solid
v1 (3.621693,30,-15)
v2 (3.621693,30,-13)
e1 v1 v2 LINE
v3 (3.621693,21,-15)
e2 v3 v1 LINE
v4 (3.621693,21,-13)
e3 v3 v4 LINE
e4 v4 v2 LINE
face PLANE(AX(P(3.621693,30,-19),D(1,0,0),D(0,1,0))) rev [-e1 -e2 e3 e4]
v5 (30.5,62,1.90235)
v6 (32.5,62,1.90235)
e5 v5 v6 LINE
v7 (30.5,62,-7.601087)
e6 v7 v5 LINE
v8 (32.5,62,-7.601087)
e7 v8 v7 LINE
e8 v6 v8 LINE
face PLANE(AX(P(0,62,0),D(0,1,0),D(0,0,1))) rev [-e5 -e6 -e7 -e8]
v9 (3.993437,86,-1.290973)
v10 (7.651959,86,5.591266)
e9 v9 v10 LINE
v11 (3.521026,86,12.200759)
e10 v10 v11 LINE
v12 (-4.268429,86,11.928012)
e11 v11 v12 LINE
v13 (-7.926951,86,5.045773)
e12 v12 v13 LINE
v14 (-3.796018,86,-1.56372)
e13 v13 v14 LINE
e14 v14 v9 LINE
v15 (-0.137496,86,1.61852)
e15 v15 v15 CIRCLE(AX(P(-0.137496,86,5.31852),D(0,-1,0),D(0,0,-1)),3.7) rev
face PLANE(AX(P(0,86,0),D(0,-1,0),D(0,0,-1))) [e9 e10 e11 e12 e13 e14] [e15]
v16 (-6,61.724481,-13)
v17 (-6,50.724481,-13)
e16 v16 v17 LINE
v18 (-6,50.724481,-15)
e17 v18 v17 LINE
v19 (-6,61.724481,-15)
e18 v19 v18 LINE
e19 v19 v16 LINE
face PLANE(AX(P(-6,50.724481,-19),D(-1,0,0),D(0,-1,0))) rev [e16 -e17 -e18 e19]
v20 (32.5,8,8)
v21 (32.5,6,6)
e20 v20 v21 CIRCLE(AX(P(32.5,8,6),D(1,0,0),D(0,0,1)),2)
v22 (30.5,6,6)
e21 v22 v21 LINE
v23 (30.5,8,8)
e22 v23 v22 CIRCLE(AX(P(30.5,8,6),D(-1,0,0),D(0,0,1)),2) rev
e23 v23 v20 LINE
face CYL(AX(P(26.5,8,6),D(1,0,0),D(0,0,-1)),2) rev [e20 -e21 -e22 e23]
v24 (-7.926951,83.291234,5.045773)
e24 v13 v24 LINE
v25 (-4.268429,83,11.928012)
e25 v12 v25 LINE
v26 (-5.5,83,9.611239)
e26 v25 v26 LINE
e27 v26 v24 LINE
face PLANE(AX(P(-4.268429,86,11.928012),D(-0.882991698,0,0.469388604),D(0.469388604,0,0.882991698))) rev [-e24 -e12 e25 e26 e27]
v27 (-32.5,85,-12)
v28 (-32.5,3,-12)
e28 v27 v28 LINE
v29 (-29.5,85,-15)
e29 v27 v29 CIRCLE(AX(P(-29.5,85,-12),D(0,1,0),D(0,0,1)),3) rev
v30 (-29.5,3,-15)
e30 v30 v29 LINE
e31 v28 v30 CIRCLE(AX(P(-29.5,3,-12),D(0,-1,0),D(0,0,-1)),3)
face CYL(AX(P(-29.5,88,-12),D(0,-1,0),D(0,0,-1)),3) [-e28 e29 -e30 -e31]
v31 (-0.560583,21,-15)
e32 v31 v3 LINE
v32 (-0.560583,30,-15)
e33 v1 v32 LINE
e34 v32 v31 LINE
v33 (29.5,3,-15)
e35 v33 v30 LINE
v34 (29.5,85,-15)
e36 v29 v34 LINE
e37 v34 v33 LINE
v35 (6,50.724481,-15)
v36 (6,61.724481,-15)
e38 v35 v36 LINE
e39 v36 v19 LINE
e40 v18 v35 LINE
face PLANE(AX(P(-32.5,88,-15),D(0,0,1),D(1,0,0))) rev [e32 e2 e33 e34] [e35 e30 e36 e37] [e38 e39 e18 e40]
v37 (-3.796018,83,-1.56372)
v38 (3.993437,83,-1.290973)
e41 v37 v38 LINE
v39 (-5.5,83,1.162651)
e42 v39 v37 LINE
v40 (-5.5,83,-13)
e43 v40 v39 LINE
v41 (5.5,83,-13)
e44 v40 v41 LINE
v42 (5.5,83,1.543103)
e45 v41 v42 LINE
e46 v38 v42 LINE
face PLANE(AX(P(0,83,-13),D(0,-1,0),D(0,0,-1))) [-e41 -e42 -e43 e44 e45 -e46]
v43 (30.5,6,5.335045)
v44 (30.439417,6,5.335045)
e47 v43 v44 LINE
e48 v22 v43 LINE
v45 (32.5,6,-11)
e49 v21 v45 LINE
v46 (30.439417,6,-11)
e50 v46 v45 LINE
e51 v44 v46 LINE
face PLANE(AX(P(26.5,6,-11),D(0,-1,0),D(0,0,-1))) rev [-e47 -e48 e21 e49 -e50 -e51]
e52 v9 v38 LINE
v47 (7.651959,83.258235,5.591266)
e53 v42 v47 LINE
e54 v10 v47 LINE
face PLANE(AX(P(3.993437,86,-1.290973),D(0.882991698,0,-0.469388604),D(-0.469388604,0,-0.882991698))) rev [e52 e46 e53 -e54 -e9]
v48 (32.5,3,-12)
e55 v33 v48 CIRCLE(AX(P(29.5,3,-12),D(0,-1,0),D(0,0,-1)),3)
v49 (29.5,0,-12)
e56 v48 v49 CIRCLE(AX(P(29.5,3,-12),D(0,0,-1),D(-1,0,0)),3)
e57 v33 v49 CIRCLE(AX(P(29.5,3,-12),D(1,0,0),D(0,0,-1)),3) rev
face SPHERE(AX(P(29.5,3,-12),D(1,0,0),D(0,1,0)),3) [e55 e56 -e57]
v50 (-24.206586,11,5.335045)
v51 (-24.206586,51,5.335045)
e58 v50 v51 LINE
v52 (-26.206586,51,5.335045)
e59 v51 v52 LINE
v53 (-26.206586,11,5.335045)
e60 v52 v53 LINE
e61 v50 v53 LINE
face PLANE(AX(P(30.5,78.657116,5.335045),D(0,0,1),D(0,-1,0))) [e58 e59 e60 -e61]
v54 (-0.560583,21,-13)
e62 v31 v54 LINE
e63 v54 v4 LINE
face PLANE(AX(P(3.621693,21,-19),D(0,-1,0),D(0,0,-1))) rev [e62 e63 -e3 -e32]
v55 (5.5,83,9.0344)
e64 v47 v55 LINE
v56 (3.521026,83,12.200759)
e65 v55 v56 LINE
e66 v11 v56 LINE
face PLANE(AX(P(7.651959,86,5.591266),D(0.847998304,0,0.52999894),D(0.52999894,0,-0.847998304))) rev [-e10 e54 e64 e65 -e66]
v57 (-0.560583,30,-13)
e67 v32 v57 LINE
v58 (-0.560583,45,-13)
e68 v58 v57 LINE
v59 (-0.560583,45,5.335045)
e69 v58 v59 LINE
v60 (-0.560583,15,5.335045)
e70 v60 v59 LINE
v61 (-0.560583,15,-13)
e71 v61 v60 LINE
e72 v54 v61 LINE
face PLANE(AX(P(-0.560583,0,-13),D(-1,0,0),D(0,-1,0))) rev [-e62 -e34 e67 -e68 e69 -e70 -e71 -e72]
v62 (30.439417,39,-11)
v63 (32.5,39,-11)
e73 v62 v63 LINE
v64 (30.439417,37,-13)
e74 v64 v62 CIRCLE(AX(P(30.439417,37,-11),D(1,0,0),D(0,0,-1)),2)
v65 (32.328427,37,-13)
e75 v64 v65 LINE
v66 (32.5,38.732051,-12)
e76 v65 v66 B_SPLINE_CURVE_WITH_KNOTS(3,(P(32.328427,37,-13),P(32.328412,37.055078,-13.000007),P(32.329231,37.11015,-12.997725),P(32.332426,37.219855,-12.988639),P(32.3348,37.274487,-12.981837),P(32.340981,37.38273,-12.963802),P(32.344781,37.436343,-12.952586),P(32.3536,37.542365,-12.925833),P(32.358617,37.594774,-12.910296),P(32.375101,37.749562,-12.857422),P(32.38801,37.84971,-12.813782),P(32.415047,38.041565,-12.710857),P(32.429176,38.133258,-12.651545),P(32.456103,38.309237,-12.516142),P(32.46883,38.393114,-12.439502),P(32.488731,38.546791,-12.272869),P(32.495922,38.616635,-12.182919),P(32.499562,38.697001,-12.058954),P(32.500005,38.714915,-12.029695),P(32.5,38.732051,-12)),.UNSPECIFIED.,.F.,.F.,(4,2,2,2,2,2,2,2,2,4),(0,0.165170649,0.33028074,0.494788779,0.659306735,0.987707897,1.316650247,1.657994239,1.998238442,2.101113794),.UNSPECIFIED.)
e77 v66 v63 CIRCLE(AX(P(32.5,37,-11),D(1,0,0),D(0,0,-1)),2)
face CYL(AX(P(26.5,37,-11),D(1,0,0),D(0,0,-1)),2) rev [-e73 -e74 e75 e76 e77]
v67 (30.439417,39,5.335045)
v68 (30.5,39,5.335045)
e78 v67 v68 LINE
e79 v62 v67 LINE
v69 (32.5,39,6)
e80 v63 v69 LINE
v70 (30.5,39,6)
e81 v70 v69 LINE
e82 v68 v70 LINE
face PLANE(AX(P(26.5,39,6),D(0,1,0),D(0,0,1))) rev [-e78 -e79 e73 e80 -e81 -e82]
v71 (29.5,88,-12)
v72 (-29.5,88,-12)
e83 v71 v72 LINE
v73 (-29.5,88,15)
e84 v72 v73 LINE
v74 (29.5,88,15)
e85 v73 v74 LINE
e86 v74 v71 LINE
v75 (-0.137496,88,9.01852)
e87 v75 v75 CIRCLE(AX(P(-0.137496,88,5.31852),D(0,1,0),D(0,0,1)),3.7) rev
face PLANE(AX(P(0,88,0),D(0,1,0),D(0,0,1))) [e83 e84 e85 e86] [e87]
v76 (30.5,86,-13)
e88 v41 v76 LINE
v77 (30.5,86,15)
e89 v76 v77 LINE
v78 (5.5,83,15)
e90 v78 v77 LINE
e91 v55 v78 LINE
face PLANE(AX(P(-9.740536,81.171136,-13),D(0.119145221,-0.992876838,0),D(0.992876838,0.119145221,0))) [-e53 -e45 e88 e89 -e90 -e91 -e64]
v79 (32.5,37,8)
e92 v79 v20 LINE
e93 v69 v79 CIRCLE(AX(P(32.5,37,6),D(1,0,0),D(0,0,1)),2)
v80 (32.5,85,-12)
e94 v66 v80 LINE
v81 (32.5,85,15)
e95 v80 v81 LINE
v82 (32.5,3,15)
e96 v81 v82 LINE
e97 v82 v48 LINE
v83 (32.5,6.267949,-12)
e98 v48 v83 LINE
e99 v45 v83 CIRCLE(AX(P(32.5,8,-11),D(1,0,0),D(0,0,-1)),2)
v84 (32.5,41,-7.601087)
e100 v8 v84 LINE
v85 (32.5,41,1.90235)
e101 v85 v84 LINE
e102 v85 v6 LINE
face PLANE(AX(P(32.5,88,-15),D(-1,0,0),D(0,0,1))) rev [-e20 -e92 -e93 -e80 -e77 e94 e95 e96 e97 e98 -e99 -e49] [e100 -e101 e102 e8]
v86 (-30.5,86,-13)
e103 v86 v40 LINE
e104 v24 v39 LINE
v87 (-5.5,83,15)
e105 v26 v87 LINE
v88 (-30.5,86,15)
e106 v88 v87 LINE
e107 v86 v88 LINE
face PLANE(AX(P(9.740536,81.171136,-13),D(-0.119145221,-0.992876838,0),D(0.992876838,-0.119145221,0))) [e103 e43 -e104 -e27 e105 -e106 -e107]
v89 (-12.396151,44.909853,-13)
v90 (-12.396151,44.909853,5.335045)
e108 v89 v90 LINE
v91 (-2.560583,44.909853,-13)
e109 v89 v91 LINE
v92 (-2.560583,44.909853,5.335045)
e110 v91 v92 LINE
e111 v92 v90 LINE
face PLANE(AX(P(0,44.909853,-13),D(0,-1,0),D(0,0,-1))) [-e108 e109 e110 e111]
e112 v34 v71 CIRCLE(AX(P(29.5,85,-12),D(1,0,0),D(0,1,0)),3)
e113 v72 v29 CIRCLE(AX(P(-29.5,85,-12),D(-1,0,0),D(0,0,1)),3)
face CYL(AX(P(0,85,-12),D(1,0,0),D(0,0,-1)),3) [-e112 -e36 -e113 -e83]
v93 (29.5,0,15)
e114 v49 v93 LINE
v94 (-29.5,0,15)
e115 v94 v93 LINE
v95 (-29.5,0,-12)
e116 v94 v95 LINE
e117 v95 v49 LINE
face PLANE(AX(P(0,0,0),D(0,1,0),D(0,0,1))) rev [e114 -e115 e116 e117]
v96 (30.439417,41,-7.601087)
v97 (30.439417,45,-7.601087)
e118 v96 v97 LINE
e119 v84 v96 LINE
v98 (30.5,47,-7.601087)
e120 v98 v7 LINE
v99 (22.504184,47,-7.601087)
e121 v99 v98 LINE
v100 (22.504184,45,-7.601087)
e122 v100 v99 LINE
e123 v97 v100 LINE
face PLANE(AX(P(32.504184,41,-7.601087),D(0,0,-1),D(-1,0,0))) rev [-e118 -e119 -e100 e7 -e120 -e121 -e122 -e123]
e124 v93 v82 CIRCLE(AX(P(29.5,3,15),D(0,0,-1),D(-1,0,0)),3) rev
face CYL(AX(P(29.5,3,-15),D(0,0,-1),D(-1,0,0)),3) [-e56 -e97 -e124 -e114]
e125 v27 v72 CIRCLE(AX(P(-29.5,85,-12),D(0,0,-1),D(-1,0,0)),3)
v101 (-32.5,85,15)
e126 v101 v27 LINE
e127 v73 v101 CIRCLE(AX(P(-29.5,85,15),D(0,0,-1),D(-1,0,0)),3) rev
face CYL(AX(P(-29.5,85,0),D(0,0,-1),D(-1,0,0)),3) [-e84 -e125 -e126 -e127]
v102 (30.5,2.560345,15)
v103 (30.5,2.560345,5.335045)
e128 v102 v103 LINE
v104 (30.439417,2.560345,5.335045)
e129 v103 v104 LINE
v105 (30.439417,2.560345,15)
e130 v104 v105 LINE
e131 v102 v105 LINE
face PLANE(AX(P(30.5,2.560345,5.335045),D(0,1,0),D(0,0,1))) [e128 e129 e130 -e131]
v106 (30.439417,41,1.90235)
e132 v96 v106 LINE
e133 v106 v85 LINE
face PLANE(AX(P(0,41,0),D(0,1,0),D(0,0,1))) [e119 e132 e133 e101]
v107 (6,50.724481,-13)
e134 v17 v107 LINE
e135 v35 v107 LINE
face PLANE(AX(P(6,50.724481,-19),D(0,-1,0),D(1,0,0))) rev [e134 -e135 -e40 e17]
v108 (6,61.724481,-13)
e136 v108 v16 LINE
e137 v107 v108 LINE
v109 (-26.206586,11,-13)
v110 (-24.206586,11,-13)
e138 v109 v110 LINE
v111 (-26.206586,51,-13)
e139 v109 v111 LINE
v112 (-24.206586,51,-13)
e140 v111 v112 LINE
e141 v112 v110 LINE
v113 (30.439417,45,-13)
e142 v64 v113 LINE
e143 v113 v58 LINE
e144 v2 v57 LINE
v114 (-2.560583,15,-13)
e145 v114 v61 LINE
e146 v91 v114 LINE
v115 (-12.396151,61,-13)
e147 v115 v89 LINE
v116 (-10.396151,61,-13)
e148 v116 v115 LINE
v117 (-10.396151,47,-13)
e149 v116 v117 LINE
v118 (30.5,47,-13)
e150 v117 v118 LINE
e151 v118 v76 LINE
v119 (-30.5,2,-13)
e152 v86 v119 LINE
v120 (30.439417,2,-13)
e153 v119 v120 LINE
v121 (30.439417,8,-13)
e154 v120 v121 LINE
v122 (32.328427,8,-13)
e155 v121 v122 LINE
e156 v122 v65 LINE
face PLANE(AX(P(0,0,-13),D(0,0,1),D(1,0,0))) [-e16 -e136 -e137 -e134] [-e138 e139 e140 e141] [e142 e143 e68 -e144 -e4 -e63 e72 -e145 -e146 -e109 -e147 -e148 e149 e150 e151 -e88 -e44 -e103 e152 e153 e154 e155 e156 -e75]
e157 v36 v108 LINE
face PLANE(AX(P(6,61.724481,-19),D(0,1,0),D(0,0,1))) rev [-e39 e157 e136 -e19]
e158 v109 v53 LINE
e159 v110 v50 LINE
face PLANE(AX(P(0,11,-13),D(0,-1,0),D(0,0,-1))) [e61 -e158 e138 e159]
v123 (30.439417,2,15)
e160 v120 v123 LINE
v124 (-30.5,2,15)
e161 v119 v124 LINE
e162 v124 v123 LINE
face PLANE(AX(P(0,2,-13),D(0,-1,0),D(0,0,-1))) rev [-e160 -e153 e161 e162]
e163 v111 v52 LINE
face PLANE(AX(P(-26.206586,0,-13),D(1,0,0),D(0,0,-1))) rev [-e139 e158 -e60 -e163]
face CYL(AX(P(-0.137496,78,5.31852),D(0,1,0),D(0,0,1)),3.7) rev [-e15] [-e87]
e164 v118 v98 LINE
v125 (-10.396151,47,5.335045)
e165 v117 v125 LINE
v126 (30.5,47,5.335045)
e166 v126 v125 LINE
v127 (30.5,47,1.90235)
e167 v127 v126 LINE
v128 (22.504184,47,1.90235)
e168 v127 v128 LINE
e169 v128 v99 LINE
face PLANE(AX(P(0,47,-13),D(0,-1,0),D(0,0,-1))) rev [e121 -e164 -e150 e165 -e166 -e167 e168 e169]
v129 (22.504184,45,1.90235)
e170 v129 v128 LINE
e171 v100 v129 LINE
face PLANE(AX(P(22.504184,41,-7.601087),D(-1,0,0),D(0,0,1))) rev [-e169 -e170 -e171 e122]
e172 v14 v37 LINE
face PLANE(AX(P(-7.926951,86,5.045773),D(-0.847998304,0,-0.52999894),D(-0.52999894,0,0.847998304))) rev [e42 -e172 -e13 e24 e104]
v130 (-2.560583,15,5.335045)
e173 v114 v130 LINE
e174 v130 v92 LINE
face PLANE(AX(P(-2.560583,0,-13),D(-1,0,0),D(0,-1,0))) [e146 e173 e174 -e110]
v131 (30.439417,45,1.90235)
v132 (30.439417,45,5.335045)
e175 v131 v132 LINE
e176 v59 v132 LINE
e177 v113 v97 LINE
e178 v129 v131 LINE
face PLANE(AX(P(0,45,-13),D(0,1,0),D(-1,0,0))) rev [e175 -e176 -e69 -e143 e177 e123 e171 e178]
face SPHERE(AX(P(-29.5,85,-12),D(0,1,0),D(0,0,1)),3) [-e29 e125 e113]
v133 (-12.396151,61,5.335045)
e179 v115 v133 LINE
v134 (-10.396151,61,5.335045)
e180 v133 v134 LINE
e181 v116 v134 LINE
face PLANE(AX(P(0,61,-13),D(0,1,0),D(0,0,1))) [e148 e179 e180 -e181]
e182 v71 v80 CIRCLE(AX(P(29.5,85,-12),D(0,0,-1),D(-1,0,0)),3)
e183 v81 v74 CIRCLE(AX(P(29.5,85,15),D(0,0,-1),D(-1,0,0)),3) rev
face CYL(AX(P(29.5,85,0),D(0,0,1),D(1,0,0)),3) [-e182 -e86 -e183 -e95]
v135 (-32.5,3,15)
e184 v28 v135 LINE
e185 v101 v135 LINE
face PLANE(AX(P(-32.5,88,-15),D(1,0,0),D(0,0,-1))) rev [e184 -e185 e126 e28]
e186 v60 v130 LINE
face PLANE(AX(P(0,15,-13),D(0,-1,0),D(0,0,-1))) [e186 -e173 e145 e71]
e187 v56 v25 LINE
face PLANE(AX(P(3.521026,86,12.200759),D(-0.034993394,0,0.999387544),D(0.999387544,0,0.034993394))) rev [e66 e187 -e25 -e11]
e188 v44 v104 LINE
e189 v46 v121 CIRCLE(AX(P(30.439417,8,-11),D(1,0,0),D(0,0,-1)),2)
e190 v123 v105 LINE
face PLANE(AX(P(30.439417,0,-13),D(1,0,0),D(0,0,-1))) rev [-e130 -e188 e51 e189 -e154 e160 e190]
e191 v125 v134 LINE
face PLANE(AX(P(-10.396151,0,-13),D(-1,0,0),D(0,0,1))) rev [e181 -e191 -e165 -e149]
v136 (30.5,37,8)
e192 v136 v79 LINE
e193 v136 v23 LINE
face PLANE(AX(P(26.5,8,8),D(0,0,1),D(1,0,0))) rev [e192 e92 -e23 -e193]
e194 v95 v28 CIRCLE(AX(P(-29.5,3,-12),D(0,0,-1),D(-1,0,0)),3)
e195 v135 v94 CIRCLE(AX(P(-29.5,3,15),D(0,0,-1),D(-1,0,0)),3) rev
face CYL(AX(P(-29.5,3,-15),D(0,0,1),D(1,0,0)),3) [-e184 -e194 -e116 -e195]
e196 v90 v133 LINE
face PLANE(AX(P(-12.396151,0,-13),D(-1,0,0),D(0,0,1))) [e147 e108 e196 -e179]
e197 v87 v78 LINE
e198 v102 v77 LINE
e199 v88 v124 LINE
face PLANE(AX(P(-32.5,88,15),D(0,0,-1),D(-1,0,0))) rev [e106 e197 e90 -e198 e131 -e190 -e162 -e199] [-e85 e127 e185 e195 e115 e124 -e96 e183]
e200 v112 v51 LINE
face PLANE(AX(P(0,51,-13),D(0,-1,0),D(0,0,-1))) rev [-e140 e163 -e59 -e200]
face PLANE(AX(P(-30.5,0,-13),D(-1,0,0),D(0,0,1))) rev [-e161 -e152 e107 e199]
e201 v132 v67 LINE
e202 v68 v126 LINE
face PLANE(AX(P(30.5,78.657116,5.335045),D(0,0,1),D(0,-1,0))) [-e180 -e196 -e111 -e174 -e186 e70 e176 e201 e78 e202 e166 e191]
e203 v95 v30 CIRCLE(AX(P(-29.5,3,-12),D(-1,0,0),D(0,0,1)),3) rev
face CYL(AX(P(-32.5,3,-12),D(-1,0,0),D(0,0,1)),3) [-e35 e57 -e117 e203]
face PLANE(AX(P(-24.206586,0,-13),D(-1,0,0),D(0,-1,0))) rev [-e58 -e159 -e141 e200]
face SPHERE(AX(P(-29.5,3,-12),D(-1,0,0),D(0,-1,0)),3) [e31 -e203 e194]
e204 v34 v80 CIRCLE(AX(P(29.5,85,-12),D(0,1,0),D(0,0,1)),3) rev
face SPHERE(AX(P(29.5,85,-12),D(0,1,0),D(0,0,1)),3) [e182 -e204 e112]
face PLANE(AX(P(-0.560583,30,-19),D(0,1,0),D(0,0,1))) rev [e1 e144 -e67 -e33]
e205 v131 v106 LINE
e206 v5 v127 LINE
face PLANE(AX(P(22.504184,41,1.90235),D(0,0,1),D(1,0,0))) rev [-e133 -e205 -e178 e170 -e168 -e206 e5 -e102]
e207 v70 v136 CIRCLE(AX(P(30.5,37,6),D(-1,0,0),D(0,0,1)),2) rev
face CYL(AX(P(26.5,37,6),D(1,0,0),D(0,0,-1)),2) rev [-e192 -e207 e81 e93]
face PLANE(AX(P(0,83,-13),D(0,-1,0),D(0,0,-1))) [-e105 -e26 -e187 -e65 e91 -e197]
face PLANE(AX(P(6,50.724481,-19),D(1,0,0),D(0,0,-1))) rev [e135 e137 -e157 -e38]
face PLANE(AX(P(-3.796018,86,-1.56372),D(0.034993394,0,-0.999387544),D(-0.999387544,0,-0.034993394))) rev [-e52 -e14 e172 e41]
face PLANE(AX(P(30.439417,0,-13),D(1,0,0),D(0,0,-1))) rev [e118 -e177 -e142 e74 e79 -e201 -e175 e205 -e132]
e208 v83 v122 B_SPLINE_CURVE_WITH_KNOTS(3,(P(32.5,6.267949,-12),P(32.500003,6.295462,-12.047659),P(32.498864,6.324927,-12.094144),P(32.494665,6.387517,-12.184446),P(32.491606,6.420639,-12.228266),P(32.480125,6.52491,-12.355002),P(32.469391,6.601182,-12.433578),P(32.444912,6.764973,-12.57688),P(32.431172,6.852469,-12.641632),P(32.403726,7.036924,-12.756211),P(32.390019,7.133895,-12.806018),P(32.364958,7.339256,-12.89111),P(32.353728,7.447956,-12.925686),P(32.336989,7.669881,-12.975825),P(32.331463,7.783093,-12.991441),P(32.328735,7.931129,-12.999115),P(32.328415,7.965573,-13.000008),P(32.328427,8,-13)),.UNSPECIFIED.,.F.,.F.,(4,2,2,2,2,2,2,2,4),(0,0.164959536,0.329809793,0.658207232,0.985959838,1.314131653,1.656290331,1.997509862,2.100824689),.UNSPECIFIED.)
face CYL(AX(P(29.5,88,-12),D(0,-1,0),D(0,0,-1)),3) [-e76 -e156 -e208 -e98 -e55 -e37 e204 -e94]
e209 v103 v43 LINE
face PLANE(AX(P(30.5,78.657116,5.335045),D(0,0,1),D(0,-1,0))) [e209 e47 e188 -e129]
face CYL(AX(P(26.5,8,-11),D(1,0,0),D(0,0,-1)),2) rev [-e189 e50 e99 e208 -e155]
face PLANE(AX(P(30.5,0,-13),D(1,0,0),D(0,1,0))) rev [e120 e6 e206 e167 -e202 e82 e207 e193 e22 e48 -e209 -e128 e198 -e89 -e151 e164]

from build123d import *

# Parameters (mm, degrees)
SKETCH_1_W               = 65
SKETCH_1_H               = 30
EXTRUDE_1_DEPTH          = 88
SKETCH_4_W               = 2
SKETCH_4_H               = 40
CUT_EXTRUDE_1_DEPTH      = 28
CUT_EXTRUDE_2_DEPTH      = 6
SKETCH_7_W               = 4.182275868
SKETCH_7_H               = 9
CUT_EXTRUDE_3_DEPTH      = 6
SKETCH_8_W               = 12
SKETCH_8_H               = 11
CUT_EXTRUDE_4_DEPTH      = 6
FILLET_1_R               = 3
CUT_EXTRUDE_5_DEPTH      = 3
CUT_EXTRUDE_6_DEPTH      = 15
CUT_EXTRUDE_6_DEPTH_BACK = 6
SKETCH_12_W              = 10
SKETCH_12_H              = 9.5034376
CUT_EXTRUDE_8_DEPTH      = 5
CUT_EXTRUDE_8_DEPTH_BACK = 10
SKETCH_18_R              = 3.7
SKETCH_19_W              = 9.664954626
SKETCH_19_H              = 76.096771223
CUT_EXTRUDE_9_DEPTH      = 61


with BuildPart() as part:
    # 草图1 → 凸台-拉伸1 (new body)
    with BuildSketch(Plane(origin=(0, 0, 0), x_dir=(1, 0, 0), z_dir=(0, 1, 0))):
        Rectangle(SKETCH_1_W, SKETCH_1_H)
    extrude(amount=EXTRUDE_1_DEPTH)

    # 草图4 → 切除-拉伸1 (cut)
    with BuildSketch(Plane.XY.offset(15)):
        Polygon((-30.5, 86), (-30.5, 2), (-18.5, 2), (-9.5, 2), (30.439417497, 2), (30.439417497, 45), (-0.560582503, 45), (-0.560582503, 15), (-2.560582503, 15), (-2.560582503, 44.909852699), (-12.396150881, 44.909852699), (-12.396150881, 61), (-10.396150881, 61), (-10.396150881, 47), (24.5, 47), (30.5, 47), (30.5, 48.635726891), (30.5, 59.903593532), (30.5, 86), (5.5, 83), (-5.5, 83), align=None)
        with Locations((-25.206585503, 31)):
            Rectangle(SKETCH_4_W, SKETCH_4_H, mode=Mode.SUBTRACT)
    extrude(amount=-CUT_EXTRUDE_1_DEPTH, mode=Mode.SUBTRACT)

    # 草图6 → 切除-拉伸2 (cut)
    with BuildSketch(Plane(origin=(32.5, 0, 0), x_dir=(0, 0, -1), z_dir=(1, 0, 0))):
        with BuildLine():
            Line((13, 37), (13, 8))
            ThreePointArc((13, 8), (12.414213562, 6.585786438), (11, 6))
            Line((11, 6), (-6, 6))
            ThreePointArc((-6, 6), (-7.414213562, 6.585786438), (-8, 8))
            Line((-8, 8), (-8, 37))
            ThreePointArc((-8, 37), (-7.414213562, 38.414213562), (-6, 39))
            Line((-6, 39), (11, 39))
            ThreePointArc((11, 39), (12.414213562, 38.414213562), (13, 37))
        make_face()
    extrude(amount=-CUT_EXTRUDE_2_DEPTH, mode=Mode.SUBTRACT)

    # 草图7 → 切除-拉伸3 (cut)
    with BuildSketch(Plane.XY.offset(-13)):
        with Locations((1.530555431, 25.5)):
            Rectangle(SKETCH_7_W, SKETCH_7_H)
    extrude(amount=-CUT_EXTRUDE_3_DEPTH, mode=Mode.SUBTRACT)

    # 草图8 → 切除-拉伸4 (cut)
    with BuildSketch(Plane.XY.offset(-13)):
        with Locations((0, 56.224480757)):
            Rectangle(SKETCH_8_W, SKETCH_8_H)
    extrude(amount=-CUT_EXTRUDE_4_DEPTH, mode=Mode.SUBTRACT)

    # 圆角1
    # the kernel refuses this fillet: 3 mm, written as the material it takes off along each edge
    with BuildSketch(Plane(origin=(29.5, 3, -12), x_dir=(0, -1, 0), z_dir=(0, 0, -1))) as fillet_1_piece_1_section:
        Polygon((0, 0), (FILLET_1_R, 0), (FILLET_1_R, -FILLET_1_R), (0, -FILLET_1_R), align=None)
    fillet_1_piece_1 = extrude(amount=FILLET_1_R, mode=Mode.PRIVATE)
    fillet_1_piece_1 = fillet_1_piece_1 - Plane(origin=(29.5, 3, -12), x_dir=(-0.7071067811865475, 0.7071067811865475, 0), z_dir=(0, 0, -1)) * Sphere(FILLET_1_R, mode=Mode.PRIVATE)
    add(fillet_1_piece_1, mode=Mode.SUBTRACT)
    with BuildSketch(Plane(origin=(29.5, 85, -12), x_dir=(0, 1, 0), z_dir=(0, 0, -1))) as fillet_1_piece_2_section:
        Polygon((0, 0), (FILLET_1_R, 0), (FILLET_1_R, FILLET_1_R), (0, FILLET_1_R), align=None)
    fillet_1_piece_2 = extrude(amount=FILLET_1_R, mode=Mode.PRIVATE)
    fillet_1_piece_2 = fillet_1_piece_2 - Plane(origin=(29.5, 85, -12), x_dir=(-0.7071067811865475, -0.7071067811865475, 0), z_dir=(0, 0, -1)) * Sphere(FILLET_1_R, mode=Mode.PRIVATE)
    add(fillet_1_piece_2, mode=Mode.SUBTRACT)
    with BuildSketch(Plane(origin=(-29.5, 3, -12), x_dir=(-1, 0, 0), z_dir=(0, 0, -1))) as fillet_1_piece_3_section:
        Polygon((0, 0), (FILLET_1_R, 0), (FILLET_1_R, -FILLET_1_R), (0, -FILLET_1_R), align=None)
    fillet_1_piece_3 = extrude(amount=FILLET_1_R, mode=Mode.PRIVATE)
    fillet_1_piece_3 = fillet_1_piece_3 - Plane(origin=(-29.5, 3, -12), x_dir=(0.7071067811865475, 0.7071067811865475, 0), z_dir=(0, 0, -1)) * Sphere(FILLET_1_R, mode=Mode.PRIVATE)
    add(fillet_1_piece_3, mode=Mode.SUBTRACT)
    with BuildSketch(Plane(origin=(-29.5, 85, -12), x_dir=(-1, 0, 0), z_dir=(0, 0, -1))) as fillet_1_piece_4_section:
        Polygon((0, 0), (FILLET_1_R, 0), (FILLET_1_R, FILLET_1_R), (0, FILLET_1_R), align=None)
    fillet_1_piece_4 = extrude(amount=FILLET_1_R, mode=Mode.PRIVATE)
    fillet_1_piece_4 = fillet_1_piece_4 - Plane(origin=(-29.5, 85, -12), x_dir=(0.7071067811865475, -0.7071067811865475, 0), z_dir=(0, 0, -1)) * Sphere(FILLET_1_R, mode=Mode.PRIVATE)
    add(fillet_1_piece_4, mode=Mode.SUBTRACT)
    with BuildSketch(Plane(origin=(32.5, 3, -15), x_dir=(-1, 0, 0), z_dir=(0, 1, 0))) as fillet_1_piece_5:
        with BuildLine():
            CenterArc((FILLET_1_R, FILLET_1_R), FILLET_1_R, 180, 90)
            Line((0, FILLET_1_R), (0, 0))
            Line((0, 0), (FILLET_1_R, 0))
        make_face()
    extrude(amount=82, mode=Mode.SUBTRACT)
    with BuildSketch(Plane(origin=(-32.5, 3, -15), x_dir=(1, 0, 0), z_dir=(0, 1, 0))) as fillet_1_piece_6:
        with BuildLine():
            CenterArc((FILLET_1_R, -FILLET_1_R), FILLET_1_R, 90, 90)
            Line((0, -FILLET_1_R), (0, 0))
            Line((0, 0), (FILLET_1_R, 0))
        make_face()
    extrude(amount=82, mode=Mode.SUBTRACT)
    with BuildSketch(Plane(origin=(-32.5, 0, 22.5), x_dir=(0, 1, 0), z_dir=(0, 0, -1)), Plane(origin=(32.5, 88, -12), x_dir=(-1, 0, 0), z_dir=(0, 0, 1))) as fillet_1_piece_7:
        with BuildLine():
            CenterArc((FILLET_1_R, FILLET_1_R), FILLET_1_R, 180, 90)
            Line((0, FILLET_1_R), (0, 0))
            Line((0, 0), (FILLET_1_R, 0))
        make_face()
    extrude(amount=34.5, mode=Mode.SUBTRACT)
    with BuildSketch(Plane(origin=(32.5, 0, -12), x_dir=(-1, 0, 0), z_dir=(0, 0, 1)), Plane(origin=(-32.5, 88, 22.5), x_dir=(0, -1, 0), z_dir=(0, 0, -1))) as fillet_1_piece_8:
        with BuildLine():
            CenterArc((FILLET_1_R, -FILLET_1_R), FILLET_1_R, 90, 90)
            Line((0, -FILLET_1_R), (0, 0))
            Line((0, 0), (FILLET_1_R, 0))
        make_face()
    extrude(amount=34.5, mode=Mode.SUBTRACT)
    with BuildSketch(Plane(origin=(-29.5, 0, -15), x_dir=(0, 1, 0), z_dir=(1, 0, 0))) as fillet_1_piece_9:
        with BuildLine():
            CenterArc((FILLET_1_R, FILLET_1_R), FILLET_1_R, 180, 90)
            Line((0, FILLET_1_R), (0, 0))
            Line((0, 0), (FILLET_1_R, 0))
        make_face()
    extrude(amount=59, mode=Mode.SUBTRACT)
    with BuildSketch(Plane(origin=(-29.5, 88, -15), x_dir=(0, -1, 0), z_dir=(1, 0, 0))) as fillet_1_piece_10:
        with BuildLine():
            CenterArc((FILLET_1_R, -FILLET_1_R), FILLET_1_R, 90, 90)
            Line((0, -FILLET_1_R), (0, 0))
            Line((0, 0), (FILLET_1_R, 0))
        make_face()
    extrude(amount=59, mode=Mode.SUBTRACT)

    # 草图10 → 切除-拉伸5 (cut)
    with BuildSketch(Plane.XZ.offset(-83)):
        Polygon((3.993436667, -1.290973026), (7.651958762, 5.591266151), (3.521025848, 12.200758813), (-4.268429161, 11.9280123), (-7.926951256, 5.045773123), (-3.796018342, -1.563719539), align=None)
    extrude(amount=-CUT_EXTRUDE_5_DEPTH, mode=Mode.SUBTRACT)

    # 草图12 → 切除-拉伸6 (cut, two sides: drawn at the far end of the back side and taken through both)
    with BuildSketch(Plane(origin=(0, 47, 0), x_dir=(1, 0, 0), z_dir=(0, 1, 0)).offset(-CUT_EXTRUDE_6_DEPTH_BACK)):
        with Locations((27.504184345, 2.8493686)):
            Rectangle(SKETCH_12_W, SKETCH_12_H)
    extrude(amount=CUT_EXTRUDE_6_DEPTH + CUT_EXTRUDE_6_DEPTH_BACK, mode=Mode.SUBTRACT)

    # 草图18 → 切除-拉伸8 (cut, two sides: drawn at the far end of the back side and taken through both)
    with BuildSketch(Plane.XZ.offset(-83).offset(-CUT_EXTRUDE_8_DEPTH_BACK)):
        with Locations(Location((-0.137496247, 5.318519637, 0), (0, 0, 90))):
            Circle(SKETCH_18_R)
    extrude(amount=CUT_EXTRUDE_8_DEPTH + CUT_EXTRUDE_8_DEPTH_BACK, mode=Mode.SUBTRACT)

    # 草图19 → 切除-拉伸9 (cut)
    with BuildSketch(Plane(origin=(-30.5, 0, 0), x_dir=(0, 0, -1), z_dir=(1, 0, 0))):
        with Locations((-10.167522687, 40.608730848)):
            Rectangle(SKETCH_19_W, SKETCH_19_H)
    extrude(amount=CUT_EXTRUDE_9_DEPTH, mode=Mode.SUBTRACT)


solid = part.part
